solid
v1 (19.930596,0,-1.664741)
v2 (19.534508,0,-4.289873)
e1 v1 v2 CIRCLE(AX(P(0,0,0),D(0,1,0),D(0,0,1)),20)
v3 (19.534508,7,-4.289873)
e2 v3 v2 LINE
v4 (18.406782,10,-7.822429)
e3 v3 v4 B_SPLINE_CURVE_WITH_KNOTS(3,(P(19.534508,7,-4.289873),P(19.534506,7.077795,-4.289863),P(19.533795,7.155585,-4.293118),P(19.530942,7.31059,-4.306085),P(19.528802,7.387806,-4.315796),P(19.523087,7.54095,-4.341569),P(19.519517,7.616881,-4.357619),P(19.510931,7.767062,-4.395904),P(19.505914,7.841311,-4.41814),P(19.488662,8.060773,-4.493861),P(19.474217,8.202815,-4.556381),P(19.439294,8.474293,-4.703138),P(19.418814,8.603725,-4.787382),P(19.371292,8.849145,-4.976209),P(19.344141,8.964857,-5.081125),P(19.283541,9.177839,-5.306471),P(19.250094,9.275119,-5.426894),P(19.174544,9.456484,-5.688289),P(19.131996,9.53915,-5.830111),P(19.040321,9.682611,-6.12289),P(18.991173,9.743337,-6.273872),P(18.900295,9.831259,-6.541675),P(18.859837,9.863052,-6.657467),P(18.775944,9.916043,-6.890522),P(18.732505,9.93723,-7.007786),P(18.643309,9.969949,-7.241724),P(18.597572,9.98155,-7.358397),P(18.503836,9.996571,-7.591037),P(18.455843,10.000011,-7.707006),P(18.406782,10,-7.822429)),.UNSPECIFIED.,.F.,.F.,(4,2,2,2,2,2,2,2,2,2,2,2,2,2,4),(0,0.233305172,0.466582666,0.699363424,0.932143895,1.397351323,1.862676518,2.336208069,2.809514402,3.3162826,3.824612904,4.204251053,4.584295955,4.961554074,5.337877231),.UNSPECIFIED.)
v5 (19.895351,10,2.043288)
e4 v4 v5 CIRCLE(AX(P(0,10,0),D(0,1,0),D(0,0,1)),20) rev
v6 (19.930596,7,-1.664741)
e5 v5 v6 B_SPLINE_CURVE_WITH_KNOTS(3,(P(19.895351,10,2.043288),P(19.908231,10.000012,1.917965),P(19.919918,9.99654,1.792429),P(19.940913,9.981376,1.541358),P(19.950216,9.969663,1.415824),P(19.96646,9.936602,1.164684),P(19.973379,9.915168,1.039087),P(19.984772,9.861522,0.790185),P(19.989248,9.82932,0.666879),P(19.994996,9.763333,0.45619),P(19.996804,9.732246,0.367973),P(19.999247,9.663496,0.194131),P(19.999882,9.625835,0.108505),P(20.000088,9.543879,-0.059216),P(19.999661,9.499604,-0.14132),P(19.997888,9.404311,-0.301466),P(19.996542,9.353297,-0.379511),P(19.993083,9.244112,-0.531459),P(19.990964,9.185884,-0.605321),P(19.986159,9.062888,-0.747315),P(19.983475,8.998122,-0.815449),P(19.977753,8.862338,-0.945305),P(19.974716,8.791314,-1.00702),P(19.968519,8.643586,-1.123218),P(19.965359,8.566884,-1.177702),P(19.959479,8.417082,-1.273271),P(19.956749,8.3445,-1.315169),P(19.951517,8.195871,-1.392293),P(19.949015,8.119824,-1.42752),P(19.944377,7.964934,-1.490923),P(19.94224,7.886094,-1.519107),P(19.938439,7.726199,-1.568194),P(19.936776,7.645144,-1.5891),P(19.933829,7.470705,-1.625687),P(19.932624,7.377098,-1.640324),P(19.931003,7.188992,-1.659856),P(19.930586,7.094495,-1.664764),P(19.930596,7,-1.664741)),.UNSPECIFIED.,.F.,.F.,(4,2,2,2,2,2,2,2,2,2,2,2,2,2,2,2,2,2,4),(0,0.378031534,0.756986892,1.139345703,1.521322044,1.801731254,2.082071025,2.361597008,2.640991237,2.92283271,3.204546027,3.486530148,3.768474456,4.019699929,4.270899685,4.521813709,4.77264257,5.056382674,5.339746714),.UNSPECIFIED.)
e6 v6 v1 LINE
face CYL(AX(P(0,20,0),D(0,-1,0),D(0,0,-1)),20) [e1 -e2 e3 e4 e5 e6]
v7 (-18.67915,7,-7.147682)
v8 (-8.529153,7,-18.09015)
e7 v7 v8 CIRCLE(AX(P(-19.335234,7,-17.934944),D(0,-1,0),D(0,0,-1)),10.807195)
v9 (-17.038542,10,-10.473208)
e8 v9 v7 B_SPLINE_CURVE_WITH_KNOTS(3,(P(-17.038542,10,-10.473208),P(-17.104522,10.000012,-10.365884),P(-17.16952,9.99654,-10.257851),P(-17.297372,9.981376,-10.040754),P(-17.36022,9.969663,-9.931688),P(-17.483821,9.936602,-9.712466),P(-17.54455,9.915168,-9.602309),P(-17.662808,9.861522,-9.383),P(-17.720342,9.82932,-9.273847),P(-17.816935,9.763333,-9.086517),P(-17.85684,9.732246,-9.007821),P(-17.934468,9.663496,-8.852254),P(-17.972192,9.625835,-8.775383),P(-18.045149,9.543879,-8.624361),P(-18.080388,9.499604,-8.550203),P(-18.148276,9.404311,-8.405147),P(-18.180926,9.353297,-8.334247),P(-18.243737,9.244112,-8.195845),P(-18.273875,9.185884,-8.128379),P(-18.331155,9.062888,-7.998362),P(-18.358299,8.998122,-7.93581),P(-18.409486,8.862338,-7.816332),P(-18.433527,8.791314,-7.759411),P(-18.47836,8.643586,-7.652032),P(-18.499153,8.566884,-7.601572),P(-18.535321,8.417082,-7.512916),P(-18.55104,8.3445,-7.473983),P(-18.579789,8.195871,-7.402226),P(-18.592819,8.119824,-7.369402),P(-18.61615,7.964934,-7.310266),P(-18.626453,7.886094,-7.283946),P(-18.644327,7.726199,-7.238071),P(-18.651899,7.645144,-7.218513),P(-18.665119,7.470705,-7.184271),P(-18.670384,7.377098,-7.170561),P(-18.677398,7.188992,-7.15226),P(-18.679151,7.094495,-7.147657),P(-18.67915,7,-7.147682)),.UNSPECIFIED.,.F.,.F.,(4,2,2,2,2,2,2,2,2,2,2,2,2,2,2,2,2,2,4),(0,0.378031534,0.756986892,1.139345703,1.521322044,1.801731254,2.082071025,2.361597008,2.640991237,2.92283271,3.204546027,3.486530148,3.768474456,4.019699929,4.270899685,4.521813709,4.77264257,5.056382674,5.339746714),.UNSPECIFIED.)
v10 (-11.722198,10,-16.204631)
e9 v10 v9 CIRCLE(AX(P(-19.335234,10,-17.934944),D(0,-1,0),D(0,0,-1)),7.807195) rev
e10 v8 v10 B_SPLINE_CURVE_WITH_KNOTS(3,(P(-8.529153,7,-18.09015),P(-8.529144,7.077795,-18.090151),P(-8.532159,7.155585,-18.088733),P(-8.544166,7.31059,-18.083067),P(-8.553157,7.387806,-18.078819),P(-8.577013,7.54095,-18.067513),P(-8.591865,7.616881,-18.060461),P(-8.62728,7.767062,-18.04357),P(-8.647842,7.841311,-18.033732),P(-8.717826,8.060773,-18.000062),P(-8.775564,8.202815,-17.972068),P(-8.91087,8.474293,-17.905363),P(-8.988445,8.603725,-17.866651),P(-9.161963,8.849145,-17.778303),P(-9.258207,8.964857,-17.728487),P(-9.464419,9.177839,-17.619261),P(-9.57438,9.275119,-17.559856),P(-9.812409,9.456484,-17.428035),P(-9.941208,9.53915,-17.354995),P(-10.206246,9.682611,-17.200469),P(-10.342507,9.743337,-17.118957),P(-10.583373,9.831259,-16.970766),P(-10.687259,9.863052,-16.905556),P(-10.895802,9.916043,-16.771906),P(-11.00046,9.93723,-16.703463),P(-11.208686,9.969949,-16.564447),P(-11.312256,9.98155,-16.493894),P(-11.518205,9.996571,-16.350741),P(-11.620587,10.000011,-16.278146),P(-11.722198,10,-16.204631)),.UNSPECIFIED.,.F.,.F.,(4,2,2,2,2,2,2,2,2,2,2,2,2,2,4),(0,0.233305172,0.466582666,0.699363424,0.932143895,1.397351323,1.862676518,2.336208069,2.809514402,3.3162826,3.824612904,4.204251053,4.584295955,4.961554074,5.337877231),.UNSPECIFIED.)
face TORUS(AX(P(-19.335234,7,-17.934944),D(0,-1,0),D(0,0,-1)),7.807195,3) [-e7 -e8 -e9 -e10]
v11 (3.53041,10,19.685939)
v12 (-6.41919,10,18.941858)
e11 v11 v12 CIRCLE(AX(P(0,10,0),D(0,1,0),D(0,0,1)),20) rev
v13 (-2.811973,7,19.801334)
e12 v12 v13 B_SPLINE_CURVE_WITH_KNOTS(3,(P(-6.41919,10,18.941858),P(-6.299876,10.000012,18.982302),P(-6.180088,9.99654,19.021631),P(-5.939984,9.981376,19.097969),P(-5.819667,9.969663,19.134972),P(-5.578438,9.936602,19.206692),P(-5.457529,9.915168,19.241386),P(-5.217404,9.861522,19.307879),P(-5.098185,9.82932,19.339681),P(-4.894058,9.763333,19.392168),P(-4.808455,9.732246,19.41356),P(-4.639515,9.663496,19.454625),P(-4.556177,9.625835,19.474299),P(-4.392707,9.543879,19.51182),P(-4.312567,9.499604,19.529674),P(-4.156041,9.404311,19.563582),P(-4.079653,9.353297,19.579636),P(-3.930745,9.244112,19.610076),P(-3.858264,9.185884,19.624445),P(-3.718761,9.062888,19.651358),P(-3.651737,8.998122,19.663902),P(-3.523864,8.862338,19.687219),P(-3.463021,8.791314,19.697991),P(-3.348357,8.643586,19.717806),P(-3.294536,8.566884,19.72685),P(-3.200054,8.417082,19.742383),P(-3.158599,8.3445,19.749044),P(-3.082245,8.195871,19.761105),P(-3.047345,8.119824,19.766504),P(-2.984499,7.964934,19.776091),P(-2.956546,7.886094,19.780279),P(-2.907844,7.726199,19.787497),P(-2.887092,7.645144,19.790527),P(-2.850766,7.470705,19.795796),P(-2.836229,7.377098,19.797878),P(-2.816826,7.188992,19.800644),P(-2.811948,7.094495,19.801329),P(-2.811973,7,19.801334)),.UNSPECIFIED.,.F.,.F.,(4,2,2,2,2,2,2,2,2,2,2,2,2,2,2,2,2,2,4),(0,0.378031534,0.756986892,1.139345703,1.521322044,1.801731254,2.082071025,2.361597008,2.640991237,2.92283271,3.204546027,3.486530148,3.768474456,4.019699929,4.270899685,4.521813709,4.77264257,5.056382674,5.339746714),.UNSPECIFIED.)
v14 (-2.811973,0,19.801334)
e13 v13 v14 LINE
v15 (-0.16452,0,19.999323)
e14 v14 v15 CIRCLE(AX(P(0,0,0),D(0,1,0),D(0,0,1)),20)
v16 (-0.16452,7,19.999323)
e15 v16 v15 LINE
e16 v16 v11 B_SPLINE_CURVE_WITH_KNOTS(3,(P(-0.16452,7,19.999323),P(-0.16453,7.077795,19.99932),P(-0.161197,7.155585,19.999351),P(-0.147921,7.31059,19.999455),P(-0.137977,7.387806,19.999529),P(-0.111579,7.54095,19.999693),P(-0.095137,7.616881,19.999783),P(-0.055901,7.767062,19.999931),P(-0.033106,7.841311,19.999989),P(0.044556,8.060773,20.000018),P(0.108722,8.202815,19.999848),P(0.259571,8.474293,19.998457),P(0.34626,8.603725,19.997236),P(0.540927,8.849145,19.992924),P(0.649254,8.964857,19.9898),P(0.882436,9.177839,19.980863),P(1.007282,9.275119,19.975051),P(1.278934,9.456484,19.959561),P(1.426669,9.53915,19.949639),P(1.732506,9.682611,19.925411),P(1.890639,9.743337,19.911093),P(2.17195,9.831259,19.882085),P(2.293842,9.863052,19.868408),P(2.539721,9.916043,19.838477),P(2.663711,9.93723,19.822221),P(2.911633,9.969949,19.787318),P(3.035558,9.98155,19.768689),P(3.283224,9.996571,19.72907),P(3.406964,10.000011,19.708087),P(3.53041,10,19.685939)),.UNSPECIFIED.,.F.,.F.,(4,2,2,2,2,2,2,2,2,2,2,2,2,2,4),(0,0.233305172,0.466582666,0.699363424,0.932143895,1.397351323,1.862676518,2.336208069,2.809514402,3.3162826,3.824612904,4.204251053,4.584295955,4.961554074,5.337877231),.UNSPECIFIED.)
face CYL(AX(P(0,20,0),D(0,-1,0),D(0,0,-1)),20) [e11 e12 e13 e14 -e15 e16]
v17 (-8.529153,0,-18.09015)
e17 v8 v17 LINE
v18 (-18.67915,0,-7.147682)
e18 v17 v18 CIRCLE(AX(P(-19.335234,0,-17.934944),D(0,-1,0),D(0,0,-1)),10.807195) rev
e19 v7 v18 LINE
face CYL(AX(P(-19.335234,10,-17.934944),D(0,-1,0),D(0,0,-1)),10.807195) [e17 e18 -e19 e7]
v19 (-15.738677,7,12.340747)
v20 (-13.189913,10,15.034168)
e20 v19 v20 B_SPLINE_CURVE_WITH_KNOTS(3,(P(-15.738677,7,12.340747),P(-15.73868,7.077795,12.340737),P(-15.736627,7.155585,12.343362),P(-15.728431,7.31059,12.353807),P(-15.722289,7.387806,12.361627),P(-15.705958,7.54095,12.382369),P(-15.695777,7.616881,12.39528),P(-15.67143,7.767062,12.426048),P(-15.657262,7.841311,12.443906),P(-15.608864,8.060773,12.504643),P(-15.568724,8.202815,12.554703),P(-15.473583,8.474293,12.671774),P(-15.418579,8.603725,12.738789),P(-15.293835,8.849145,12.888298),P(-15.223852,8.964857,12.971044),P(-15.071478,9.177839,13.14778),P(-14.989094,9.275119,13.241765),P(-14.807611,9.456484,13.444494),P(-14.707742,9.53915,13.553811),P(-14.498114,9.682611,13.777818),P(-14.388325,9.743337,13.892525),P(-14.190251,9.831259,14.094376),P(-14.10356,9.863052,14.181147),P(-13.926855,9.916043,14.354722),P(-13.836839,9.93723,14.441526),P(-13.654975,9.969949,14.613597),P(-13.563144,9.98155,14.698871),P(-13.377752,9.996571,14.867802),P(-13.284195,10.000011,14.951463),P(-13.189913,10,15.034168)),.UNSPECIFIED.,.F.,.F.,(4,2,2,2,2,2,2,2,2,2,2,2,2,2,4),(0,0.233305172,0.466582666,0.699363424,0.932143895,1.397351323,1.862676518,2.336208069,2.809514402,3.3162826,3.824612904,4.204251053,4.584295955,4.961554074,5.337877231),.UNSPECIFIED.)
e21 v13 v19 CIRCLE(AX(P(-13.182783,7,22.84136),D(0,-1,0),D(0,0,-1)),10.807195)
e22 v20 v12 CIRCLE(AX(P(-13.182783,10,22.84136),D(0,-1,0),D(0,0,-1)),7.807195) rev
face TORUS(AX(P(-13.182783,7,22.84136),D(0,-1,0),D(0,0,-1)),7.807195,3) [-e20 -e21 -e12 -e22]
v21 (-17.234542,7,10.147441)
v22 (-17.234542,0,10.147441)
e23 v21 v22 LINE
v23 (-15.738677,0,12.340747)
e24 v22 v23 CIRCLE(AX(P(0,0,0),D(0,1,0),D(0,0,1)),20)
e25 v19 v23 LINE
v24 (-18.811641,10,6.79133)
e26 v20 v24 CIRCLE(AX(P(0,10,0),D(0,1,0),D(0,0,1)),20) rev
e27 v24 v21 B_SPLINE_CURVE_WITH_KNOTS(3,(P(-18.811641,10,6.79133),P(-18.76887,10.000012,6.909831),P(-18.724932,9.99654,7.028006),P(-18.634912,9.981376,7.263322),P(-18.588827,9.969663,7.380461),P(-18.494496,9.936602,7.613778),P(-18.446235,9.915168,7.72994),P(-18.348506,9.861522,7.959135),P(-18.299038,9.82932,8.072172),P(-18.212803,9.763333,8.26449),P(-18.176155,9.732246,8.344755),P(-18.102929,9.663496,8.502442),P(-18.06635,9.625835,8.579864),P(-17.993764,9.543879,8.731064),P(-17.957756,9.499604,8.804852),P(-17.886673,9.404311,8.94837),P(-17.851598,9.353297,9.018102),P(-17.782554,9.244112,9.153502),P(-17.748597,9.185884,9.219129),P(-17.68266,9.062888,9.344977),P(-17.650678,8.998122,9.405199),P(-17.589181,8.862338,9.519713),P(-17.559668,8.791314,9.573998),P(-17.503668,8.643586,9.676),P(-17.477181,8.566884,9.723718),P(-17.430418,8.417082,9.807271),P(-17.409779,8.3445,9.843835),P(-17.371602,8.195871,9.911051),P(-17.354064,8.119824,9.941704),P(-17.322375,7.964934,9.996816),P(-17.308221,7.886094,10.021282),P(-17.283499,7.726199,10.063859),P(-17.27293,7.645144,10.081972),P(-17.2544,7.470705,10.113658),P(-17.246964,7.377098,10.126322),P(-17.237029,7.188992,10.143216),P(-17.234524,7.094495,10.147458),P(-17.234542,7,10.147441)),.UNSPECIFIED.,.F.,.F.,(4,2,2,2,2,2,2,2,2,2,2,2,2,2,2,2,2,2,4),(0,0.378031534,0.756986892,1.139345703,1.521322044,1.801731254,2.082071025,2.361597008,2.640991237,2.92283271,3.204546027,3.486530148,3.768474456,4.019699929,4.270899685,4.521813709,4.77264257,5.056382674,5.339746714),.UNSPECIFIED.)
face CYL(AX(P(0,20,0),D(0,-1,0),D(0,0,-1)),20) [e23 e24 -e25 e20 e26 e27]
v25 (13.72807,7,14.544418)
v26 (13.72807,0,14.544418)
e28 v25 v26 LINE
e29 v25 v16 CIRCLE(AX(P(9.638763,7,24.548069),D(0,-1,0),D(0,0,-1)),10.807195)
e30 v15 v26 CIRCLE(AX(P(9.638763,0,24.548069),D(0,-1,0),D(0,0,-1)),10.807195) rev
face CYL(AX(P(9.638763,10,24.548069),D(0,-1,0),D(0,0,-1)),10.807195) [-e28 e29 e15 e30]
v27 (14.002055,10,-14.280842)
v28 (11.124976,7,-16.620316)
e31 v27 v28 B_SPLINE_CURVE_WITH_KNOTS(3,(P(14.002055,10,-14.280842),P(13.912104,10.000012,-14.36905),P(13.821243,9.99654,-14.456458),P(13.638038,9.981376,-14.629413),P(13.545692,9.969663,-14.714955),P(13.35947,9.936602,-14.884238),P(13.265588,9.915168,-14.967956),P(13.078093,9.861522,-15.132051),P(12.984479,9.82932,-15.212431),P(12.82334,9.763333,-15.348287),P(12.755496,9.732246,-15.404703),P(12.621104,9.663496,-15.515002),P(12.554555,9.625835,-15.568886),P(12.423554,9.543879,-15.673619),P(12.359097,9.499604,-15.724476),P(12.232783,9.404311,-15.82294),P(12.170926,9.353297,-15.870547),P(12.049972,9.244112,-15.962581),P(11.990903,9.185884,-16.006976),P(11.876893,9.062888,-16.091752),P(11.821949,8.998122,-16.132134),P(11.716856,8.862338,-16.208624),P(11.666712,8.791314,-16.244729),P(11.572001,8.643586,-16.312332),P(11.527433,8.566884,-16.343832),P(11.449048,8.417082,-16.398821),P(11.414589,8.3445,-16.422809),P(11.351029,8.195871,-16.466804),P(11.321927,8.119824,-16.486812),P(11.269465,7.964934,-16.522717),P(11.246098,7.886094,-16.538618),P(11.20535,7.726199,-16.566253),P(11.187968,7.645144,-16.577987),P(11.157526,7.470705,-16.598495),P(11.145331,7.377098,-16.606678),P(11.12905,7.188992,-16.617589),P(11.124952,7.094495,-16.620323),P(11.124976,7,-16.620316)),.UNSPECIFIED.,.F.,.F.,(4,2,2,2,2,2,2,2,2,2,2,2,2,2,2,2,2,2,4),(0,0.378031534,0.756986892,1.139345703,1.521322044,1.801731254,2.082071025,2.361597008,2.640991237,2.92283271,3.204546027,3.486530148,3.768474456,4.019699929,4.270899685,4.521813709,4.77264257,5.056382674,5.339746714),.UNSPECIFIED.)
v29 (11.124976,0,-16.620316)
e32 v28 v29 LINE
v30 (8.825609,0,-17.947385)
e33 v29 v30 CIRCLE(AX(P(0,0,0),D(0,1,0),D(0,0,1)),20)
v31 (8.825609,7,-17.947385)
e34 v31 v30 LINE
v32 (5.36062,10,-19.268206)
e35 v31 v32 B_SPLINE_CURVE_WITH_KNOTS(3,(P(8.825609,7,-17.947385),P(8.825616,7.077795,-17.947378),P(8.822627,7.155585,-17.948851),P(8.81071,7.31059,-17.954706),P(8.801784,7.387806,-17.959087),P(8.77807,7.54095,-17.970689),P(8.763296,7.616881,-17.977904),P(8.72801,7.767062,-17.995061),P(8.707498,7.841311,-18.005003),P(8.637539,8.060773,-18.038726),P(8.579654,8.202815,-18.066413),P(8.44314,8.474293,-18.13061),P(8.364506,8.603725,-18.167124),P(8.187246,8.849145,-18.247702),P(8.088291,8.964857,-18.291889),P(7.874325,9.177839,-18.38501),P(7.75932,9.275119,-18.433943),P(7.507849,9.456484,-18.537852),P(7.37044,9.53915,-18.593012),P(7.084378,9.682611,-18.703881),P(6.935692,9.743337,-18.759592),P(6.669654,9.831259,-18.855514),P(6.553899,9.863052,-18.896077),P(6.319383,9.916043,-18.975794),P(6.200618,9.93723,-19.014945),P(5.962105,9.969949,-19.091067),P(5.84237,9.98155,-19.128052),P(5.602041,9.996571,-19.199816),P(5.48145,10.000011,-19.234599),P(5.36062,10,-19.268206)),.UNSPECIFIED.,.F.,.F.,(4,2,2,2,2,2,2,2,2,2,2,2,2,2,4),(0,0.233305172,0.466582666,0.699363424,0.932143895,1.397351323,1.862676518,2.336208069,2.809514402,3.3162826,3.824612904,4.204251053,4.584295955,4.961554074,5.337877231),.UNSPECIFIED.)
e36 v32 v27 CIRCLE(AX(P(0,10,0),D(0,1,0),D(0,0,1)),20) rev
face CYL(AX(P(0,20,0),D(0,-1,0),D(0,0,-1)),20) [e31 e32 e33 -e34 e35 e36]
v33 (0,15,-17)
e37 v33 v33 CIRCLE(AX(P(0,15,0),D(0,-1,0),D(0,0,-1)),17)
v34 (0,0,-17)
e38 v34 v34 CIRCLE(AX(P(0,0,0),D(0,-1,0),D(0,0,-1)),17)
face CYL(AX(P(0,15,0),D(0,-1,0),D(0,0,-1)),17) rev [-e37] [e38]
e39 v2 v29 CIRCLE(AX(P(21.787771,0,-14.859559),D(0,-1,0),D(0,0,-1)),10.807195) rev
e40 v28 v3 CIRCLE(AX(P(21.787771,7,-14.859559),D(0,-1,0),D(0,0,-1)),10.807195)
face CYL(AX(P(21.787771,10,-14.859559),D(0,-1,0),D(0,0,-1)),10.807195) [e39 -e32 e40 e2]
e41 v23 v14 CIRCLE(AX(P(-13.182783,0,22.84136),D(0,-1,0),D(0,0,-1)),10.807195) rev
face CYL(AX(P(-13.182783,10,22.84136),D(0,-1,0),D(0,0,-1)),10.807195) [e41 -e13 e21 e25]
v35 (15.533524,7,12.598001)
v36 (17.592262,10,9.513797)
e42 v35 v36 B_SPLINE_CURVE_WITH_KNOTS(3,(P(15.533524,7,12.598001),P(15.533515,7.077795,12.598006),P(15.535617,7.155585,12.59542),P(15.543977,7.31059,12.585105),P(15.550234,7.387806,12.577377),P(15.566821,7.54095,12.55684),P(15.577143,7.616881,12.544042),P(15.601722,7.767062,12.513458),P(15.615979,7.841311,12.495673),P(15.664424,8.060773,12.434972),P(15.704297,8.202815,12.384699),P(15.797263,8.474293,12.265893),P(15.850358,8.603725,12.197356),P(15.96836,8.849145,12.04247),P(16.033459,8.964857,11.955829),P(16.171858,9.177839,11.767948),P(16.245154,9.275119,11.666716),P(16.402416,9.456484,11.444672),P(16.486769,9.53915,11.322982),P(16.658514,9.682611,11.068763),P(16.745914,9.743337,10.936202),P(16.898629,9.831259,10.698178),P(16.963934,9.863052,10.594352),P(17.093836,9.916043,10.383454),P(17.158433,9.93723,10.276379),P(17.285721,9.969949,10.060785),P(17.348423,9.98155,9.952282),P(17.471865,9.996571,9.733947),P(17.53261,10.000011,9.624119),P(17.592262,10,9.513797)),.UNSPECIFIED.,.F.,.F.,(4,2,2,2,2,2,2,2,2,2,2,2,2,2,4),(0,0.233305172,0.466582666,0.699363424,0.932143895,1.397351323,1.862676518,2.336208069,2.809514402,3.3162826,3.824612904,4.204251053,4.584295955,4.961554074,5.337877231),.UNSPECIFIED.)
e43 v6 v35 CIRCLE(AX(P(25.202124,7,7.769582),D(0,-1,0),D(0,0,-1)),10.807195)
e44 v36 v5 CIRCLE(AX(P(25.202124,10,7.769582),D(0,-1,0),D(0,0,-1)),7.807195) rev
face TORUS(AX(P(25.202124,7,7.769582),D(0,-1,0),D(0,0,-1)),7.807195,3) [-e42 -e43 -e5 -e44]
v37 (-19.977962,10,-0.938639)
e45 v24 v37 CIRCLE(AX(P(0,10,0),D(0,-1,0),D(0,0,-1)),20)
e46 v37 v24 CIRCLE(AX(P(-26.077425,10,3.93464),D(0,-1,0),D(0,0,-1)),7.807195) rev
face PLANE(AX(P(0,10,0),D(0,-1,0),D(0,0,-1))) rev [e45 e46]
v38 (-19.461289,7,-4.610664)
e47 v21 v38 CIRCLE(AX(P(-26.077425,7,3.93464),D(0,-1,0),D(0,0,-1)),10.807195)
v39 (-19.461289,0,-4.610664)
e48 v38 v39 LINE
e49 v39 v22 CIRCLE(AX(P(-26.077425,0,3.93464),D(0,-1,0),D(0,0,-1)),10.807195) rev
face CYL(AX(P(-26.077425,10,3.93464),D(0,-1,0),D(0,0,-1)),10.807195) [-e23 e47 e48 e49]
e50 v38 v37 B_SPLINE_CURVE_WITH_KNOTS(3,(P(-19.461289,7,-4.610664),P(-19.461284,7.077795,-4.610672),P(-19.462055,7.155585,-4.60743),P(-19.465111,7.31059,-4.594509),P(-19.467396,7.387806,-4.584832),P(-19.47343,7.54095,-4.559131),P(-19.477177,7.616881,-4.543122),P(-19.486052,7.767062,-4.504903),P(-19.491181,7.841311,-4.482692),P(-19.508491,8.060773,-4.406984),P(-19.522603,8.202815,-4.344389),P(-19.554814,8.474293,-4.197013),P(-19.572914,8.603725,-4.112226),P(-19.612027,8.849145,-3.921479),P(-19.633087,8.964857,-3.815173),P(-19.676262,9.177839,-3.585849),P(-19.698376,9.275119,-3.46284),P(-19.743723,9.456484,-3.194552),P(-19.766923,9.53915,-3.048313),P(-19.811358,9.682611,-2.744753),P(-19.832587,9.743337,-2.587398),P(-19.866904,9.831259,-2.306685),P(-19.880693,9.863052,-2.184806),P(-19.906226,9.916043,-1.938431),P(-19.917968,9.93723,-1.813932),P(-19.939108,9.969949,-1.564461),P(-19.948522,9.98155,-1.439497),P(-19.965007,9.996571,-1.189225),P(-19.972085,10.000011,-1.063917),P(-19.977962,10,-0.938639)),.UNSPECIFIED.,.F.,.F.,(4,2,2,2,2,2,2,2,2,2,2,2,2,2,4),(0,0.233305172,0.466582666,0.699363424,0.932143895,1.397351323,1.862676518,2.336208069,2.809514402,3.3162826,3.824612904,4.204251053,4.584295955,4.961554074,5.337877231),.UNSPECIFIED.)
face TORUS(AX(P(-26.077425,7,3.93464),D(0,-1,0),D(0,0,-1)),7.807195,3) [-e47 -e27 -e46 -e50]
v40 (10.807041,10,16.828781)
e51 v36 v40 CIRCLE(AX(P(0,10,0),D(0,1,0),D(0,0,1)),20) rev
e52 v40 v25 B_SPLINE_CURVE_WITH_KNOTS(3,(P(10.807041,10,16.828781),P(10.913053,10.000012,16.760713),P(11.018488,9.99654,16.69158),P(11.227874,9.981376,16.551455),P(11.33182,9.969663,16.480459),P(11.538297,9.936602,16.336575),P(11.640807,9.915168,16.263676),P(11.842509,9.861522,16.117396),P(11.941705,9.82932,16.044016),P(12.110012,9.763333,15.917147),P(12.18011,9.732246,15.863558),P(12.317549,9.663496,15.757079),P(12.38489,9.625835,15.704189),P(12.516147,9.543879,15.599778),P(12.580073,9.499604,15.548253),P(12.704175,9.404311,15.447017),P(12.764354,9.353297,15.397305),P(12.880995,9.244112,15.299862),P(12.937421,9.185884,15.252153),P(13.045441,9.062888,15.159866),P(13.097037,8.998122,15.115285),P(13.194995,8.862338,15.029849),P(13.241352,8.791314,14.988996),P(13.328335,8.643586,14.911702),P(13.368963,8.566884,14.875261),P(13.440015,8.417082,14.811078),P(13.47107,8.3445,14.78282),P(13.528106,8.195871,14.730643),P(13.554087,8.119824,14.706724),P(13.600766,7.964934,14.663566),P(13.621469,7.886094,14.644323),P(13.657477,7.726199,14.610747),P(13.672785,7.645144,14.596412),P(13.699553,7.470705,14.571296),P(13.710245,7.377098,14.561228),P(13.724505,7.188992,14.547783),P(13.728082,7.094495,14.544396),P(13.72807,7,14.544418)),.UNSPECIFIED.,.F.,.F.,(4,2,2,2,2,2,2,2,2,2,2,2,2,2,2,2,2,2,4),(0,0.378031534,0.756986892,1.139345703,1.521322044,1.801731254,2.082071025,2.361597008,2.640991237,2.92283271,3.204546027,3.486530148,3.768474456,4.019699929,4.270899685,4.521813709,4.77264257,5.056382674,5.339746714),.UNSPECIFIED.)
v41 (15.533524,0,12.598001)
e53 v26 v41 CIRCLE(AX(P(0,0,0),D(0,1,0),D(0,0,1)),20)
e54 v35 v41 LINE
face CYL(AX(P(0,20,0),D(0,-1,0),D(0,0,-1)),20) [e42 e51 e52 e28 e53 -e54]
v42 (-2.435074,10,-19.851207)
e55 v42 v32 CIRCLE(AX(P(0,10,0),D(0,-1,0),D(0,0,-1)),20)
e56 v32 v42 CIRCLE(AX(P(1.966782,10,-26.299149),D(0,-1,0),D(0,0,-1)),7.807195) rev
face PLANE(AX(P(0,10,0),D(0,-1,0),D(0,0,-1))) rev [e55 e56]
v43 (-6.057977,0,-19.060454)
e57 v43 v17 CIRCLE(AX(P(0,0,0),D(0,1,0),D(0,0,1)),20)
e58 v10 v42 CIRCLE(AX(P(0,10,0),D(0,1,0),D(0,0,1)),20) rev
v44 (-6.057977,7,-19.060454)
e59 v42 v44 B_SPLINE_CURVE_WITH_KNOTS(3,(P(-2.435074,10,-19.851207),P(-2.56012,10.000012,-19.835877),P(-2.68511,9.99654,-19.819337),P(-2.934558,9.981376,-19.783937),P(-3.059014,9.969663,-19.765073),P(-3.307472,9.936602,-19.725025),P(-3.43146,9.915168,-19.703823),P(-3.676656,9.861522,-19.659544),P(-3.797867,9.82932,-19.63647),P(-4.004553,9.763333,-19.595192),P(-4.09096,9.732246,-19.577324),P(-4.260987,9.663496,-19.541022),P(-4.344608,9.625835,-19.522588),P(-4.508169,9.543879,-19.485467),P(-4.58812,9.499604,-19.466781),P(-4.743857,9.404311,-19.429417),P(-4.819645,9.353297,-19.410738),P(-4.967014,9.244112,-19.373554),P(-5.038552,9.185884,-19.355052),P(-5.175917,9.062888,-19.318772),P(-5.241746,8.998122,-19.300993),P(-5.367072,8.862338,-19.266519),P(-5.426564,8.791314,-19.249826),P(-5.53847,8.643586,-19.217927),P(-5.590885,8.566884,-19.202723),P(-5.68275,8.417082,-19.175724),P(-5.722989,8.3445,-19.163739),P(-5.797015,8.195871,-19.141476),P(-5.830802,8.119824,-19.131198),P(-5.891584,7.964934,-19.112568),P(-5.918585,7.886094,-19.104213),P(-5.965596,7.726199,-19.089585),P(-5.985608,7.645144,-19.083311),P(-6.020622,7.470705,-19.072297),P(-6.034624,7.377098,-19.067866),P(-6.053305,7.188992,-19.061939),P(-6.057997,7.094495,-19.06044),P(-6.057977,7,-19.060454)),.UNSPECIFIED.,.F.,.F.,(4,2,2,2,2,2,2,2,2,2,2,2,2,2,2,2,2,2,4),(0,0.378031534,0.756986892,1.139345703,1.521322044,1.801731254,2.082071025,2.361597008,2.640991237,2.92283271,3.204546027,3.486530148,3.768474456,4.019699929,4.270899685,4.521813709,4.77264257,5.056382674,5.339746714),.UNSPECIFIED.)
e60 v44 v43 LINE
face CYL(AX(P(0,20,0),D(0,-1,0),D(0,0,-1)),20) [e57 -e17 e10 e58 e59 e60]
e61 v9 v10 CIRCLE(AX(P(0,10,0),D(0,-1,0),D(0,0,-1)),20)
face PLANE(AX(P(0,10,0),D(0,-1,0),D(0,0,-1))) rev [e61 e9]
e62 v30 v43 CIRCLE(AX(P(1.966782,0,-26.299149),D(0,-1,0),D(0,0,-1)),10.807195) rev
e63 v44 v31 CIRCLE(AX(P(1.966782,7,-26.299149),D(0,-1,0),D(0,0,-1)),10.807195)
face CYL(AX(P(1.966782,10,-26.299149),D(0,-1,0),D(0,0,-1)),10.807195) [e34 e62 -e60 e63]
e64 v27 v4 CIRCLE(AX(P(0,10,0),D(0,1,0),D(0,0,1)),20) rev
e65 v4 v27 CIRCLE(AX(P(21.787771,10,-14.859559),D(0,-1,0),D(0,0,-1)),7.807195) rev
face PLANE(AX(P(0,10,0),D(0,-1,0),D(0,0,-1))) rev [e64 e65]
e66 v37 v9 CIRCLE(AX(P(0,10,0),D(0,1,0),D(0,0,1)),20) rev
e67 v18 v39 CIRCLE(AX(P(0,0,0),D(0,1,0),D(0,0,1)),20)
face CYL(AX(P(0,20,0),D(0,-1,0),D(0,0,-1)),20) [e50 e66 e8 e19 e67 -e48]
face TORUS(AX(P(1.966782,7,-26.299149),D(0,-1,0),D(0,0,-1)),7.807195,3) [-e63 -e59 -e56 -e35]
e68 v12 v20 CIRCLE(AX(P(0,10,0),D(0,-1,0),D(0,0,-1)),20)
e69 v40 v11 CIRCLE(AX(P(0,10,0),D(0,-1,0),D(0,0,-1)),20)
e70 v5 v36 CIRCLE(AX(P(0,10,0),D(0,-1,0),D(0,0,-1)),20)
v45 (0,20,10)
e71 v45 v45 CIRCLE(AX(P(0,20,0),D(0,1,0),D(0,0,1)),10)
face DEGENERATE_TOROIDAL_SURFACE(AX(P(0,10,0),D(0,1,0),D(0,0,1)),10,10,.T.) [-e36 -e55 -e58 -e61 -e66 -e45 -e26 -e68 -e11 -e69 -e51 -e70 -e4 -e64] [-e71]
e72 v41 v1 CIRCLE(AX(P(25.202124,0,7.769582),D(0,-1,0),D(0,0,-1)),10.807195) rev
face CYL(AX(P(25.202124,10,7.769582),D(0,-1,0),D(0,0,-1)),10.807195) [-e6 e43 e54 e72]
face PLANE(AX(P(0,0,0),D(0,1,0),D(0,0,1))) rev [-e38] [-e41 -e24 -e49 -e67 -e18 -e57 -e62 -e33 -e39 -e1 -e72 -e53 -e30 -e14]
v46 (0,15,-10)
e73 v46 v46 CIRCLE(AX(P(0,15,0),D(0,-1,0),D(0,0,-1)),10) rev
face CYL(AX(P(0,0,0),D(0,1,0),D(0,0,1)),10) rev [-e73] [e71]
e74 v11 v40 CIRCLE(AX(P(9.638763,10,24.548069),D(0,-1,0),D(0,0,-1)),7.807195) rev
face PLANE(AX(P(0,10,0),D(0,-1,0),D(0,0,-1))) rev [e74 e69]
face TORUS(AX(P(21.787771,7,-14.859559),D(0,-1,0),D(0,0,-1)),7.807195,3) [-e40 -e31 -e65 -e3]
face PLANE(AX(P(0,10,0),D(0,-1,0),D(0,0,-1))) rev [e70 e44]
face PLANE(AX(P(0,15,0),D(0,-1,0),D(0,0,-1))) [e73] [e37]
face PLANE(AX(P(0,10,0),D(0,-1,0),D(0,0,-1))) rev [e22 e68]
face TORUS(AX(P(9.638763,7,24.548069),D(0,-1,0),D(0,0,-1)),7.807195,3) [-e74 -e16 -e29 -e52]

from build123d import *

# Parameters (mm, degrees)
SKETCH3_R           = 20
BOSS_EXTRUDE2_DEPTH = 20
FILLET2_R           = 10
SKETCH4_R           = 10
CUT_EXTRUDE1_DEPTH  = 35.641016209
SKETCH5_R           = 17
CUT_EXTRUDE3_DEPTH  = 15
BOSS_EXTRUDE3_DEPTH = 10
FILLET4_R           = 3


with BuildPart() as part:
    # Sketch3 → Boss-Extrude2 (new body)
    with BuildSketch(Plane(origin=(0, 0, 0), x_dir=(1, 0, 0), z_dir=(0, 1, 0))):
        with Locations(Location((0, 0, 0), (0, 0, 270))):
            Circle(SKETCH3_R)
    extrude(amount=BOSS_EXTRUDE2_DEPTH)

    # Fillet2
    fillet2_edges = [part.edges().sort_by_distance(p)[0] for p in [
        (0, 20, -20),
    ]]
    fillet(fillet2_edges, radius=FILLET2_R)

    # Sketch4 → Cut-Extrude1 (cut, through all)
    with BuildSketch(Plane(origin=(0, 20, 0), x_dir=(1, 0, 0), z_dir=(0, 1, 0))):
        with Locations(Location((0, 0, 0), (0, 0, 270))):
            Circle(SKETCH4_R)
    extrude(amount=-CUT_EXTRUDE1_DEPTH, mode=Mode.SUBTRACT)

    # Sketch5 → Cut-Extrude3 (cut)
    with BuildSketch(Plane.XZ):
        with Locations(Location((0, 0, 0), (0, 0, 270))):
            Circle(SKETCH5_R)
    extrude(amount=-CUT_EXTRUDE3_DEPTH, mode=Mode.SUBTRACT)

    # Sketch6 → Boss-Extrude3 (add)
    with BuildSketch(Plane.XZ):
        with BuildLine():
            ThreePointArc((19.534507746, -4.289872624), (16.523043018, -11.268941807), (11.12497647, -16.620315838))
            ThreePointArc((11.12497647, -16.620315838), (30.716158677, -20.948841221), (19.534507746, -4.289872624))
        make_face()
        with BuildLine():
            ThreePointArc((19.930595545, -1.664740583), (35.529675275, 10.953471012), (15.533523837, 12.598001318))
            ThreePointArc((15.533523837, 12.598001318), (18.850337885, 6.683170029), (20, 0))
            ThreePointArc((20, 0), (19.982641353, -0.83309336), (19.930595545, -1.664740583))
        make_face()
        with BuildLine():
            ThreePointArc((13.728069665, 14.544418286), (13.588621718, 34.607596163), (-0.164520348, 19.999323315))
            ThreePointArc((-0.164520348, 19.999323315), (7.309682944, 18.616351287), (13.728069665, 14.544418286))
        make_face()
        with BuildLine():
            ThreePointArc((-2.811972675, 19.801333533), (-18.584941151, 32.201495537), (-15.738677355, 12.340746944))
            ThreePointArc((-15.738677355, 12.340746944), (-9.997336755, 17.322045428), (-2.811972675, 19.801333533))
        make_face()
        with BuildLine():
            ThreePointArc((-17.234542237, 10.147440756), (-36.763664269, 5.54701198), (-19.461289303, -4.610663581))
            ThreePointArc((-19.461289303, -4.610663581), (-19.776157969, 2.983886056), (-17.234542237, 10.147440756))
        make_face()
        with BuildLine():
            ThreePointArc((-8.529153468, -18.090150389), (-14.663128872, -13.601200376), (-18.679149974, -7.14768188))
            ThreePointArc((-18.679149974, -7.14768188), (-27.25859835, -25.284484736), (-8.529153468, -18.090150389))
        make_face()
        with BuildLine():
            ThreePointArc((8.825608891, -17.947384982), (1.491535339, -19.944305511), (-6.057976796, -19.060454274))
            ThreePointArc((-6.057976796, -19.060454274), (2.7727481, -37.076248736), (8.825608891, -17.947384982))
        make_face()
    extrude(amount=-BOSS_EXTRUDE3_DEPTH)

    # Fillet4
    # the kernel refuses this fillet: 3 mm, written as the material it takes off along each edge
    with BuildSketch(Plane(origin=(21.787771386, 10, -14.859558714), x_dir=(-0.8613411629371903, 0, 0.5080269688018624), z_dir=(0.5080269688018624, 0, 0.8613411629371903))) as fillet4_piece_1_section:
        with BuildLine():
            CenterArc((10.807194875 - FILLET4_R, FILLET4_R), FILLET4_R, 270, 90)
            Line((10.807194875, FILLET4_R), (10.807194875, 0))
            Line((10.807194875, 0), (10.807194875 - FILLET4_R, 0))
        make_face()
    fillet4_piece_1 = revolve(axis=Axis((21.787771386, 10, -14.859558714), (0, -1, 0)), revolution_arc=352.475944856, mode=Mode.PRIVATE)
    fillet4_piece_1 = fillet4_piece_1 - Plane(origin=(0, 9.153525429, 0), x_dir=(0, 0, 1), z_dir=(0, -1, 0)) * Cylinder(20, 44, mode=Mode.PRIVATE)
    add(fillet4_piece_1, mode=Mode.SUBTRACT)
    with BuildSketch(Plane(origin=(25.202124082, 10, 7.769582284), x_dir=(-0.9342289091645791, 0, -0.3566740042127554), z_dir=(-0.3566740042127554, 0, 0.9342289091645791))) as fillet4_piece_2_section:
        with BuildLine():
            CenterArc((10.807194875 - FILLET4_R, FILLET4_R), FILLET4_R, 270, 90)
            Line((10.807194875 - FILLET4_R, 0), (10.807194875, 0))
            Line((10.807194875, 0), (10.807194875, FILLET4_R))
        make_face()
    fillet4_piece_2 = revolve(axis=Axis((25.202124082, 10, 7.769582284), (0, -1, 0)), revolution_arc=352.475944856, mode=Mode.PRIVATE)
    fillet4_piece_2 = fillet4_piece_2 - Plane(origin=(0, 9.954455144, 0), x_dir=(0, 0, 1), z_dir=(0, -1, 0)) * Cylinder(20, 44, mode=Mode.PRIVATE)
    add(fillet4_piece_2, mode=Mode.SUBTRACT)
    with BuildSketch(Plane(origin=(9.638763315, 10, 24.548069352), x_dir=(-0.30362323199425595, 0, -0.9527921772314055), z_dir=(-0.9527921772314055, 0, 0.30362323199425595))) as fillet4_piece_3_section:
        with BuildLine():
            CenterArc((10.807194875 - FILLET4_R, FILLET4_R), FILLET4_R, 270, 90)
            Line((10.807194875 - FILLET4_R, 0), (10.807194875, 0))
            Line((10.807194875, 0), (10.807194875, FILLET4_R))
        make_face()
    fillet4_piece_3 = revolve(axis=Axis((9.638763315, 10, 24.548069352), (0, -1, 0)), revolution_arc=352.475944856, mode=Mode.PRIVATE)
    fillet4_piece_3 = fillet4_piece_3 - Plane(origin=(0, 9.954455222, 0), x_dir=(0, 0, 1), z_dir=(0, -1, 0)) * Cylinder(20, 44, mode=Mode.PRIVATE)
    add(fillet4_piece_3, mode=Mode.SUBTRACT)
    with BuildSketch(Plane(origin=(-13.182782823, 10, 22.841359508), x_dir=(0.5556169316529679, 0, -0.831438407376362), z_dir=(-0.831438407376362, 0, -0.5556169316529679))) as fillet4_piece_4_section:
        with BuildLine():
            CenterArc((10.807194875 - FILLET4_R, FILLET4_R), FILLET4_R, 270, 90)
            Line((10.807194875, FILLET4_R), (10.807194875, 0))
            Line((10.807194875, 0), (10.807194875 - FILLET4_R, 0))
        make_face()
    fillet4_piece_4 = revolve(axis=Axis((-13.182782823, 10, 22.841359508), (0, -1, 0)), revolution_arc=352.475944856, mode=Mode.PRIVATE)
    fillet4_piece_4 = fillet4_piece_4 - Plane(origin=(0, 9.153525429, 0), x_dir=(0, 0, 1), z_dir=(0, -1, 0)) * Cylinder(20, 44, mode=Mode.PRIVATE)
    add(fillet4_piece_4, mode=Mode.SUBTRACT)
    with BuildSketch(Plane(origin=(-26.077424616, 10, 3.934640076), x_dir=(0.9964662132455853, 0, -0.08399455851424971), z_dir=(-0.08399455851424971, 0, -0.9964662132455853))) as fillet4_piece_5_section:
        with BuildLine():
            CenterArc((10.807194875 - FILLET4_R, FILLET4_R), FILLET4_R, 270, 90)
            Line((10.807194875, FILLET4_R), (10.807194875, 0))
            Line((10.807194875, 0), (10.807194875 - FILLET4_R, 0))
        make_face()
    fillet4_piece_5 = revolve(axis=Axis((-26.077424616, 10, 3.934640076), (0, -1, 0)), revolution_arc=352.475944856, mode=Mode.PRIVATE)
    fillet4_piece_5 = fillet4_piece_5 - Plane(origin=(0, 9.153525429, 0), x_dir=(0, 0, 1), z_dir=(0, -1, 0)) * Cylinder(20, 44, mode=Mode.PRIVATE)
    add(fillet4_piece_5, mode=Mode.SUBTRACT)
    with BuildSketch(Plane(origin=(-19.33523379, 10, -17.934943585), x_dir=(0.6869561120578647, 0, 0.7266989060858304), z_dir=(0.7266989060858304, 0, -0.6869561120578647))) as fillet4_piece_6_section:
        with BuildLine():
            CenterArc((10.807194875 - FILLET4_R, FILLET4_R), FILLET4_R, 270, 90)
            Line((10.807194875, FILLET4_R), (10.807194875, 0))
            Line((10.807194875, 0), (10.807194875 - FILLET4_R, 0))
        make_face()
    fillet4_piece_6 = revolve(axis=Axis((-19.33523379, 10, -17.934943585), (0, -1, 0)), revolution_arc=352.475944856, mode=Mode.PRIVATE)
    fillet4_piece_6 = fillet4_piece_6 - Plane(origin=(0, 9.153525429, 0), x_dir=(0, 0, 1), z_dir=(0, -1, 0)) * Cylinder(20, 44, mode=Mode.PRIVATE)
    add(fillet4_piece_6, mode=Mode.SUBTRACT)
    with BuildSketch(Plane(origin=(1.966782447, 10, -26.29914892), x_dir=(-0.13984595286037754, 0, 0.990173272447087), z_dir=(0.990173272447087, 0, 0.13984595286037754))) as fillet4_piece_7_section:
        with BuildLine():
            CenterArc((10.807194875 - FILLET4_R, FILLET4_R), FILLET4_R, 270, 90)
            Line((10.807194875, FILLET4_R), (10.807194875, 0))
            Line((10.807194875, 0), (10.807194875 - FILLET4_R, 0))
        make_face()
    fillet4_piece_7 = revolve(axis=Axis((1.966782447, 10, -26.29914892), (0, -1, 0)), revolution_arc=352.475944856, mode=Mode.PRIVATE)
    fillet4_piece_7 = fillet4_piece_7 - Plane(origin=(0, 9.153525429, 0), x_dir=(0, 0, 1), z_dir=(0, -1, 0)) * Cylinder(20, 44, mode=Mode.PRIVATE)
    add(fillet4_piece_7, mode=Mode.SUBTRACT)


solid = part.part
